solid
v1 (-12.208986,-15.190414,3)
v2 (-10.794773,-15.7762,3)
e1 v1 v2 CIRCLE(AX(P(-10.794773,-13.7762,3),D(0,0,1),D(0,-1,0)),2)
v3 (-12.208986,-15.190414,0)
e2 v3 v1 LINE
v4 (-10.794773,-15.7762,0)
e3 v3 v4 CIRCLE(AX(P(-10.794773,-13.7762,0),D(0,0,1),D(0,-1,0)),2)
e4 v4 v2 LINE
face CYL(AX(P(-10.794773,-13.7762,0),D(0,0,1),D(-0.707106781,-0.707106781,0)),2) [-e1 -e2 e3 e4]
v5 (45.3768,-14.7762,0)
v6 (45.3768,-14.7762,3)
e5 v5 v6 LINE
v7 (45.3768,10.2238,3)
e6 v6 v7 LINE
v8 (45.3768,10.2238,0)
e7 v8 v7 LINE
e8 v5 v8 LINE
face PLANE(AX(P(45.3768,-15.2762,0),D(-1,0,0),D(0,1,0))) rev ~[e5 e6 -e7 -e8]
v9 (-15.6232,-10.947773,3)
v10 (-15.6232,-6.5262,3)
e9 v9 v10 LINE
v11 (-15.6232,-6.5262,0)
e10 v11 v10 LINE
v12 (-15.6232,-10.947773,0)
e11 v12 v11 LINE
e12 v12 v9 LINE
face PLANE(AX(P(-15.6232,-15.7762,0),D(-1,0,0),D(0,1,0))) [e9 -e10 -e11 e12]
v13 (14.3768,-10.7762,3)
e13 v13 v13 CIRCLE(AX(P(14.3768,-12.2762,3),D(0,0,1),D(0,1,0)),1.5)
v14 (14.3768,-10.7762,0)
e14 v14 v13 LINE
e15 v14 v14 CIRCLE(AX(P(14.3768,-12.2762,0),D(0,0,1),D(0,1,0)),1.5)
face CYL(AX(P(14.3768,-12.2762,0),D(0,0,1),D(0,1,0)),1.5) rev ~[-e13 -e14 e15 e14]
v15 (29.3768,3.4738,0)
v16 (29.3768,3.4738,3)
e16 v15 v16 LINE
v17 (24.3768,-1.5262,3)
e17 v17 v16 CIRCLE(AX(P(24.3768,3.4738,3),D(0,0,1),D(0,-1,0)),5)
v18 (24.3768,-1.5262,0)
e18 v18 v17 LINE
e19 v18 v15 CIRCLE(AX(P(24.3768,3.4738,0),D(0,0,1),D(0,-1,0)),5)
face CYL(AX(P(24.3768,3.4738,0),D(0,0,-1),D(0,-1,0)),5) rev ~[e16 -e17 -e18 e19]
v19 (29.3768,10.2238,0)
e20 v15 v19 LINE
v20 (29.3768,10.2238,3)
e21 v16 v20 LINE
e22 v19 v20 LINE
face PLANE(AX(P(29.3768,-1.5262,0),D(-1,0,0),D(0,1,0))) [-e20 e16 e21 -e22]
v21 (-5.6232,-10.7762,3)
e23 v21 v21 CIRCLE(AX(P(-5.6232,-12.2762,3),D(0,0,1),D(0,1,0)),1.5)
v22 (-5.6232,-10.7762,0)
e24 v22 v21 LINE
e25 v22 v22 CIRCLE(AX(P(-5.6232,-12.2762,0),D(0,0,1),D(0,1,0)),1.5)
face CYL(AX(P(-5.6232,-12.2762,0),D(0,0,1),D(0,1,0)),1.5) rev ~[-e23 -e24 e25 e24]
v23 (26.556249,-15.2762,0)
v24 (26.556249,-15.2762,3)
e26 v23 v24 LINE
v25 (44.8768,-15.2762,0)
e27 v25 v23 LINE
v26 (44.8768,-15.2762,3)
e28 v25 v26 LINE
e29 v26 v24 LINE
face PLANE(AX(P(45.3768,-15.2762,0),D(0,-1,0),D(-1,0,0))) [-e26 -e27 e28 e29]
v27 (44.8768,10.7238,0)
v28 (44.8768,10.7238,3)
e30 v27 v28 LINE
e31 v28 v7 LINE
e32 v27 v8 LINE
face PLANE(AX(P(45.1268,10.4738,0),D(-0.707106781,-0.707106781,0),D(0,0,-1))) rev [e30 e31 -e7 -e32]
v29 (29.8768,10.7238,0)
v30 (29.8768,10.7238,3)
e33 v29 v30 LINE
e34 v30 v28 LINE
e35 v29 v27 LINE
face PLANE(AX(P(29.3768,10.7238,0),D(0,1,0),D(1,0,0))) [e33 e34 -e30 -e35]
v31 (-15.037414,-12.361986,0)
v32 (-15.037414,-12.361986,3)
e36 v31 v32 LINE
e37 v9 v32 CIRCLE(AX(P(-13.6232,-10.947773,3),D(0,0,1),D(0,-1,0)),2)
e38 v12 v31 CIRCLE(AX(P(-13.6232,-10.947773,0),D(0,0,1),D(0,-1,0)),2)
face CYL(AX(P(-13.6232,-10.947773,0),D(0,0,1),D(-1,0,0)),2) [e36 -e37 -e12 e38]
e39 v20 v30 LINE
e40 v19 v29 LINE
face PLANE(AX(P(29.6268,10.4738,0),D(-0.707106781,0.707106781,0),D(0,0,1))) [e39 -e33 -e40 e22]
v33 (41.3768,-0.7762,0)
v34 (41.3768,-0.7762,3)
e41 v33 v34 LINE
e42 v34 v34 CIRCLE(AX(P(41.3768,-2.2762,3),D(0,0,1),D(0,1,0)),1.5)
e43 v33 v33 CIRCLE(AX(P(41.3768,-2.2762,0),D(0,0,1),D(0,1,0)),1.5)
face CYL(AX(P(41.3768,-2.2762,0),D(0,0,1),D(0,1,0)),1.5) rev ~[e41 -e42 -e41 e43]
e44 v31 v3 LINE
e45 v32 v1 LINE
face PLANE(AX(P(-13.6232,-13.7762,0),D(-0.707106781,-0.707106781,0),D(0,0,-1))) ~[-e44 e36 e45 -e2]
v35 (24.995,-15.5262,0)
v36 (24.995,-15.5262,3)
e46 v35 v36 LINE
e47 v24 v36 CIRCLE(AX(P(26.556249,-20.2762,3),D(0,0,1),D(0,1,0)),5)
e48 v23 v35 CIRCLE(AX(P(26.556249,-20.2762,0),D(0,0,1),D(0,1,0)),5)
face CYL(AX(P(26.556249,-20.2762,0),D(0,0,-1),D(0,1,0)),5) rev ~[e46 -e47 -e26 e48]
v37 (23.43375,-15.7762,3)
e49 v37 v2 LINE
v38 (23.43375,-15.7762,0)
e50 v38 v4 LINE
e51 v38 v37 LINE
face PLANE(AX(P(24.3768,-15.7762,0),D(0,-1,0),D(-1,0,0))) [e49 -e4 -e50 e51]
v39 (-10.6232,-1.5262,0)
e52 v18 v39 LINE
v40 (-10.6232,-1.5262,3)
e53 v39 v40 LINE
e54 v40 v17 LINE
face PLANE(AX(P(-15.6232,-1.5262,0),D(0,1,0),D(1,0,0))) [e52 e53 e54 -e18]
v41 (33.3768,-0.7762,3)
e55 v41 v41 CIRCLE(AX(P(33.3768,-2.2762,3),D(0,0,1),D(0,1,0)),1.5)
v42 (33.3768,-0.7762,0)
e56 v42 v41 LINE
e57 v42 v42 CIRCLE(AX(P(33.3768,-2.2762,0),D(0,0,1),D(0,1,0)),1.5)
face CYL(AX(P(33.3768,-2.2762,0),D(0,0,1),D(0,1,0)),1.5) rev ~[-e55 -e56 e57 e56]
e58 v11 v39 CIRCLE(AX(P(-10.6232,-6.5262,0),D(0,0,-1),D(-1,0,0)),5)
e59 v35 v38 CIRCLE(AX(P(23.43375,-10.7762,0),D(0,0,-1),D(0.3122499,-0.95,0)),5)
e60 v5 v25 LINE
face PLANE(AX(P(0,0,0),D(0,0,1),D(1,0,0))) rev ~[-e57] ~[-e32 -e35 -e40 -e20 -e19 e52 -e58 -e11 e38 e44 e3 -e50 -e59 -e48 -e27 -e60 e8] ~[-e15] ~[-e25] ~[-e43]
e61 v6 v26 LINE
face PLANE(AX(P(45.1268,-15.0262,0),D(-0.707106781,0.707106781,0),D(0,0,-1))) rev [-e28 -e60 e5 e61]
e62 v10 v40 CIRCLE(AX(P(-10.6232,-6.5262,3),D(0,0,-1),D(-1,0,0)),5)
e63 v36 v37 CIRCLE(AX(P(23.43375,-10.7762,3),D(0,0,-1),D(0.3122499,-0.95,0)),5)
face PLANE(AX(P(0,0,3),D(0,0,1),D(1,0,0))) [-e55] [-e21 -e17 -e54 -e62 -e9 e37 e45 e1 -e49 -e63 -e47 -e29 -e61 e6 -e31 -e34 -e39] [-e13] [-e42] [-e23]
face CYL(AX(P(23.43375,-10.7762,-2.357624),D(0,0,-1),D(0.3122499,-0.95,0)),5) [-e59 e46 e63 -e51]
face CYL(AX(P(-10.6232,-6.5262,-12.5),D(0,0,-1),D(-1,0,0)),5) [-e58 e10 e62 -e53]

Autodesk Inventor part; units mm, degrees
ref_plane "YZ Plane" through (0, 0, 0) normal (1, 0, 0) x (0, 1, 0)
ref_plane "XZ Plane" through (0, 0, 0) normal (0, 1, 0) x (-1, 0, 0)
ref_plane "XY Plane" through (0, 0, 0) normal (0, 0, 1) x (1, 0, 0)
sketch "Szkic1" plane through (0, 0, 0) normal (0, 0, 1) x (1, 0, 0)
  line L0 (-15.6232, -1.5262) -> (24.3768, -1.5262)
  line L1 (24.3768, -1.5262) -> (24.3768, -15.7762)
  line L2 (24.3768, -15.7762) -> (-15.6232, -15.7762)
  line L3 (-15.6232, -15.7762) -> (-15.6232, -1.5262)
  line L4 (24.3768, -1.5262) -> (29.3768, -1.5262)
  line L5 (29.3768, -1.5262) -> (29.3768, 10.7238)
  line L6 (29.3768, 10.7238) -> (45.3768, 10.7238)
  line L7 (45.3768, -15.2762) -> (45.3768, 10.7238)
  line L8 (45.3768, -15.2762) -> (24.3768, -15.2762)
  point P0 (0, 0)
  point P1 (-5.6232, -12.2762)
  point P2 (14.3768, -12.2762)
  point P3 (33.3768, -2.2762)
  point P4 (41.3768, -2.2762)
  dimension "d0" = 40
  dimension "d1" = 14.25
  dimension "d2" = 10
  dimension "d3" = 10
  dimension "d4" = 3.5
  dimension "d5" = 3.5
  dimension "d6" = 5
  dimension "d7" = 16
  dimension "d18" = 26
  dimension "d19" = 0.5
  dimension "d20" = 13
  dimension "d21" = 13
  dimension "d22" = 4
  dimension "d23" = 4
extrude "Wyciągnięcie proste1" add sketch "Szkic1" along normal blind 3
hole "Otwór1" at (-5.6232, -12.2762, 0) at (14.3768, -12.2762, 0) at (33.3768, -2.2762, 0) at (41.3768, -2.2762, 0) direction (0, 0, 1) diameter 3 end through all
chamfer "Faza1" distance 4 angle 45 1 edges at (-15.6232, -15.7762, 1.5)
fillet "Zaokrąglenie1" radius 2 2 edges at (-15.6232, -11.7762, 1.5) (-11.6232, -15.7762, 1.5)
fillet "Zaokrąglenie2" radius 5 4 edges at (-15.6232, -1.5262, 1.5) (29.3768, -1.5262, 1.5) (24.3768, -15.2762, 1.5) (24.3768, -15.7762, 1.5)
chamfer "Faza2" distance 0.5 angle 45 3 edges at (29.3768, 10.7238, 1.5) (45.3768, 10.7238, 1.5) (45.3768, -15.2762, 1.5)
equation "\"d3\" = d2"
equation "\"d20\" = 0.5 * d18"
equation "\"d21\" = 0.5 * d18"
properties part number "LC_ALU_3mm_Y_Axis_IGUS_Cable_Chain_Mount"
